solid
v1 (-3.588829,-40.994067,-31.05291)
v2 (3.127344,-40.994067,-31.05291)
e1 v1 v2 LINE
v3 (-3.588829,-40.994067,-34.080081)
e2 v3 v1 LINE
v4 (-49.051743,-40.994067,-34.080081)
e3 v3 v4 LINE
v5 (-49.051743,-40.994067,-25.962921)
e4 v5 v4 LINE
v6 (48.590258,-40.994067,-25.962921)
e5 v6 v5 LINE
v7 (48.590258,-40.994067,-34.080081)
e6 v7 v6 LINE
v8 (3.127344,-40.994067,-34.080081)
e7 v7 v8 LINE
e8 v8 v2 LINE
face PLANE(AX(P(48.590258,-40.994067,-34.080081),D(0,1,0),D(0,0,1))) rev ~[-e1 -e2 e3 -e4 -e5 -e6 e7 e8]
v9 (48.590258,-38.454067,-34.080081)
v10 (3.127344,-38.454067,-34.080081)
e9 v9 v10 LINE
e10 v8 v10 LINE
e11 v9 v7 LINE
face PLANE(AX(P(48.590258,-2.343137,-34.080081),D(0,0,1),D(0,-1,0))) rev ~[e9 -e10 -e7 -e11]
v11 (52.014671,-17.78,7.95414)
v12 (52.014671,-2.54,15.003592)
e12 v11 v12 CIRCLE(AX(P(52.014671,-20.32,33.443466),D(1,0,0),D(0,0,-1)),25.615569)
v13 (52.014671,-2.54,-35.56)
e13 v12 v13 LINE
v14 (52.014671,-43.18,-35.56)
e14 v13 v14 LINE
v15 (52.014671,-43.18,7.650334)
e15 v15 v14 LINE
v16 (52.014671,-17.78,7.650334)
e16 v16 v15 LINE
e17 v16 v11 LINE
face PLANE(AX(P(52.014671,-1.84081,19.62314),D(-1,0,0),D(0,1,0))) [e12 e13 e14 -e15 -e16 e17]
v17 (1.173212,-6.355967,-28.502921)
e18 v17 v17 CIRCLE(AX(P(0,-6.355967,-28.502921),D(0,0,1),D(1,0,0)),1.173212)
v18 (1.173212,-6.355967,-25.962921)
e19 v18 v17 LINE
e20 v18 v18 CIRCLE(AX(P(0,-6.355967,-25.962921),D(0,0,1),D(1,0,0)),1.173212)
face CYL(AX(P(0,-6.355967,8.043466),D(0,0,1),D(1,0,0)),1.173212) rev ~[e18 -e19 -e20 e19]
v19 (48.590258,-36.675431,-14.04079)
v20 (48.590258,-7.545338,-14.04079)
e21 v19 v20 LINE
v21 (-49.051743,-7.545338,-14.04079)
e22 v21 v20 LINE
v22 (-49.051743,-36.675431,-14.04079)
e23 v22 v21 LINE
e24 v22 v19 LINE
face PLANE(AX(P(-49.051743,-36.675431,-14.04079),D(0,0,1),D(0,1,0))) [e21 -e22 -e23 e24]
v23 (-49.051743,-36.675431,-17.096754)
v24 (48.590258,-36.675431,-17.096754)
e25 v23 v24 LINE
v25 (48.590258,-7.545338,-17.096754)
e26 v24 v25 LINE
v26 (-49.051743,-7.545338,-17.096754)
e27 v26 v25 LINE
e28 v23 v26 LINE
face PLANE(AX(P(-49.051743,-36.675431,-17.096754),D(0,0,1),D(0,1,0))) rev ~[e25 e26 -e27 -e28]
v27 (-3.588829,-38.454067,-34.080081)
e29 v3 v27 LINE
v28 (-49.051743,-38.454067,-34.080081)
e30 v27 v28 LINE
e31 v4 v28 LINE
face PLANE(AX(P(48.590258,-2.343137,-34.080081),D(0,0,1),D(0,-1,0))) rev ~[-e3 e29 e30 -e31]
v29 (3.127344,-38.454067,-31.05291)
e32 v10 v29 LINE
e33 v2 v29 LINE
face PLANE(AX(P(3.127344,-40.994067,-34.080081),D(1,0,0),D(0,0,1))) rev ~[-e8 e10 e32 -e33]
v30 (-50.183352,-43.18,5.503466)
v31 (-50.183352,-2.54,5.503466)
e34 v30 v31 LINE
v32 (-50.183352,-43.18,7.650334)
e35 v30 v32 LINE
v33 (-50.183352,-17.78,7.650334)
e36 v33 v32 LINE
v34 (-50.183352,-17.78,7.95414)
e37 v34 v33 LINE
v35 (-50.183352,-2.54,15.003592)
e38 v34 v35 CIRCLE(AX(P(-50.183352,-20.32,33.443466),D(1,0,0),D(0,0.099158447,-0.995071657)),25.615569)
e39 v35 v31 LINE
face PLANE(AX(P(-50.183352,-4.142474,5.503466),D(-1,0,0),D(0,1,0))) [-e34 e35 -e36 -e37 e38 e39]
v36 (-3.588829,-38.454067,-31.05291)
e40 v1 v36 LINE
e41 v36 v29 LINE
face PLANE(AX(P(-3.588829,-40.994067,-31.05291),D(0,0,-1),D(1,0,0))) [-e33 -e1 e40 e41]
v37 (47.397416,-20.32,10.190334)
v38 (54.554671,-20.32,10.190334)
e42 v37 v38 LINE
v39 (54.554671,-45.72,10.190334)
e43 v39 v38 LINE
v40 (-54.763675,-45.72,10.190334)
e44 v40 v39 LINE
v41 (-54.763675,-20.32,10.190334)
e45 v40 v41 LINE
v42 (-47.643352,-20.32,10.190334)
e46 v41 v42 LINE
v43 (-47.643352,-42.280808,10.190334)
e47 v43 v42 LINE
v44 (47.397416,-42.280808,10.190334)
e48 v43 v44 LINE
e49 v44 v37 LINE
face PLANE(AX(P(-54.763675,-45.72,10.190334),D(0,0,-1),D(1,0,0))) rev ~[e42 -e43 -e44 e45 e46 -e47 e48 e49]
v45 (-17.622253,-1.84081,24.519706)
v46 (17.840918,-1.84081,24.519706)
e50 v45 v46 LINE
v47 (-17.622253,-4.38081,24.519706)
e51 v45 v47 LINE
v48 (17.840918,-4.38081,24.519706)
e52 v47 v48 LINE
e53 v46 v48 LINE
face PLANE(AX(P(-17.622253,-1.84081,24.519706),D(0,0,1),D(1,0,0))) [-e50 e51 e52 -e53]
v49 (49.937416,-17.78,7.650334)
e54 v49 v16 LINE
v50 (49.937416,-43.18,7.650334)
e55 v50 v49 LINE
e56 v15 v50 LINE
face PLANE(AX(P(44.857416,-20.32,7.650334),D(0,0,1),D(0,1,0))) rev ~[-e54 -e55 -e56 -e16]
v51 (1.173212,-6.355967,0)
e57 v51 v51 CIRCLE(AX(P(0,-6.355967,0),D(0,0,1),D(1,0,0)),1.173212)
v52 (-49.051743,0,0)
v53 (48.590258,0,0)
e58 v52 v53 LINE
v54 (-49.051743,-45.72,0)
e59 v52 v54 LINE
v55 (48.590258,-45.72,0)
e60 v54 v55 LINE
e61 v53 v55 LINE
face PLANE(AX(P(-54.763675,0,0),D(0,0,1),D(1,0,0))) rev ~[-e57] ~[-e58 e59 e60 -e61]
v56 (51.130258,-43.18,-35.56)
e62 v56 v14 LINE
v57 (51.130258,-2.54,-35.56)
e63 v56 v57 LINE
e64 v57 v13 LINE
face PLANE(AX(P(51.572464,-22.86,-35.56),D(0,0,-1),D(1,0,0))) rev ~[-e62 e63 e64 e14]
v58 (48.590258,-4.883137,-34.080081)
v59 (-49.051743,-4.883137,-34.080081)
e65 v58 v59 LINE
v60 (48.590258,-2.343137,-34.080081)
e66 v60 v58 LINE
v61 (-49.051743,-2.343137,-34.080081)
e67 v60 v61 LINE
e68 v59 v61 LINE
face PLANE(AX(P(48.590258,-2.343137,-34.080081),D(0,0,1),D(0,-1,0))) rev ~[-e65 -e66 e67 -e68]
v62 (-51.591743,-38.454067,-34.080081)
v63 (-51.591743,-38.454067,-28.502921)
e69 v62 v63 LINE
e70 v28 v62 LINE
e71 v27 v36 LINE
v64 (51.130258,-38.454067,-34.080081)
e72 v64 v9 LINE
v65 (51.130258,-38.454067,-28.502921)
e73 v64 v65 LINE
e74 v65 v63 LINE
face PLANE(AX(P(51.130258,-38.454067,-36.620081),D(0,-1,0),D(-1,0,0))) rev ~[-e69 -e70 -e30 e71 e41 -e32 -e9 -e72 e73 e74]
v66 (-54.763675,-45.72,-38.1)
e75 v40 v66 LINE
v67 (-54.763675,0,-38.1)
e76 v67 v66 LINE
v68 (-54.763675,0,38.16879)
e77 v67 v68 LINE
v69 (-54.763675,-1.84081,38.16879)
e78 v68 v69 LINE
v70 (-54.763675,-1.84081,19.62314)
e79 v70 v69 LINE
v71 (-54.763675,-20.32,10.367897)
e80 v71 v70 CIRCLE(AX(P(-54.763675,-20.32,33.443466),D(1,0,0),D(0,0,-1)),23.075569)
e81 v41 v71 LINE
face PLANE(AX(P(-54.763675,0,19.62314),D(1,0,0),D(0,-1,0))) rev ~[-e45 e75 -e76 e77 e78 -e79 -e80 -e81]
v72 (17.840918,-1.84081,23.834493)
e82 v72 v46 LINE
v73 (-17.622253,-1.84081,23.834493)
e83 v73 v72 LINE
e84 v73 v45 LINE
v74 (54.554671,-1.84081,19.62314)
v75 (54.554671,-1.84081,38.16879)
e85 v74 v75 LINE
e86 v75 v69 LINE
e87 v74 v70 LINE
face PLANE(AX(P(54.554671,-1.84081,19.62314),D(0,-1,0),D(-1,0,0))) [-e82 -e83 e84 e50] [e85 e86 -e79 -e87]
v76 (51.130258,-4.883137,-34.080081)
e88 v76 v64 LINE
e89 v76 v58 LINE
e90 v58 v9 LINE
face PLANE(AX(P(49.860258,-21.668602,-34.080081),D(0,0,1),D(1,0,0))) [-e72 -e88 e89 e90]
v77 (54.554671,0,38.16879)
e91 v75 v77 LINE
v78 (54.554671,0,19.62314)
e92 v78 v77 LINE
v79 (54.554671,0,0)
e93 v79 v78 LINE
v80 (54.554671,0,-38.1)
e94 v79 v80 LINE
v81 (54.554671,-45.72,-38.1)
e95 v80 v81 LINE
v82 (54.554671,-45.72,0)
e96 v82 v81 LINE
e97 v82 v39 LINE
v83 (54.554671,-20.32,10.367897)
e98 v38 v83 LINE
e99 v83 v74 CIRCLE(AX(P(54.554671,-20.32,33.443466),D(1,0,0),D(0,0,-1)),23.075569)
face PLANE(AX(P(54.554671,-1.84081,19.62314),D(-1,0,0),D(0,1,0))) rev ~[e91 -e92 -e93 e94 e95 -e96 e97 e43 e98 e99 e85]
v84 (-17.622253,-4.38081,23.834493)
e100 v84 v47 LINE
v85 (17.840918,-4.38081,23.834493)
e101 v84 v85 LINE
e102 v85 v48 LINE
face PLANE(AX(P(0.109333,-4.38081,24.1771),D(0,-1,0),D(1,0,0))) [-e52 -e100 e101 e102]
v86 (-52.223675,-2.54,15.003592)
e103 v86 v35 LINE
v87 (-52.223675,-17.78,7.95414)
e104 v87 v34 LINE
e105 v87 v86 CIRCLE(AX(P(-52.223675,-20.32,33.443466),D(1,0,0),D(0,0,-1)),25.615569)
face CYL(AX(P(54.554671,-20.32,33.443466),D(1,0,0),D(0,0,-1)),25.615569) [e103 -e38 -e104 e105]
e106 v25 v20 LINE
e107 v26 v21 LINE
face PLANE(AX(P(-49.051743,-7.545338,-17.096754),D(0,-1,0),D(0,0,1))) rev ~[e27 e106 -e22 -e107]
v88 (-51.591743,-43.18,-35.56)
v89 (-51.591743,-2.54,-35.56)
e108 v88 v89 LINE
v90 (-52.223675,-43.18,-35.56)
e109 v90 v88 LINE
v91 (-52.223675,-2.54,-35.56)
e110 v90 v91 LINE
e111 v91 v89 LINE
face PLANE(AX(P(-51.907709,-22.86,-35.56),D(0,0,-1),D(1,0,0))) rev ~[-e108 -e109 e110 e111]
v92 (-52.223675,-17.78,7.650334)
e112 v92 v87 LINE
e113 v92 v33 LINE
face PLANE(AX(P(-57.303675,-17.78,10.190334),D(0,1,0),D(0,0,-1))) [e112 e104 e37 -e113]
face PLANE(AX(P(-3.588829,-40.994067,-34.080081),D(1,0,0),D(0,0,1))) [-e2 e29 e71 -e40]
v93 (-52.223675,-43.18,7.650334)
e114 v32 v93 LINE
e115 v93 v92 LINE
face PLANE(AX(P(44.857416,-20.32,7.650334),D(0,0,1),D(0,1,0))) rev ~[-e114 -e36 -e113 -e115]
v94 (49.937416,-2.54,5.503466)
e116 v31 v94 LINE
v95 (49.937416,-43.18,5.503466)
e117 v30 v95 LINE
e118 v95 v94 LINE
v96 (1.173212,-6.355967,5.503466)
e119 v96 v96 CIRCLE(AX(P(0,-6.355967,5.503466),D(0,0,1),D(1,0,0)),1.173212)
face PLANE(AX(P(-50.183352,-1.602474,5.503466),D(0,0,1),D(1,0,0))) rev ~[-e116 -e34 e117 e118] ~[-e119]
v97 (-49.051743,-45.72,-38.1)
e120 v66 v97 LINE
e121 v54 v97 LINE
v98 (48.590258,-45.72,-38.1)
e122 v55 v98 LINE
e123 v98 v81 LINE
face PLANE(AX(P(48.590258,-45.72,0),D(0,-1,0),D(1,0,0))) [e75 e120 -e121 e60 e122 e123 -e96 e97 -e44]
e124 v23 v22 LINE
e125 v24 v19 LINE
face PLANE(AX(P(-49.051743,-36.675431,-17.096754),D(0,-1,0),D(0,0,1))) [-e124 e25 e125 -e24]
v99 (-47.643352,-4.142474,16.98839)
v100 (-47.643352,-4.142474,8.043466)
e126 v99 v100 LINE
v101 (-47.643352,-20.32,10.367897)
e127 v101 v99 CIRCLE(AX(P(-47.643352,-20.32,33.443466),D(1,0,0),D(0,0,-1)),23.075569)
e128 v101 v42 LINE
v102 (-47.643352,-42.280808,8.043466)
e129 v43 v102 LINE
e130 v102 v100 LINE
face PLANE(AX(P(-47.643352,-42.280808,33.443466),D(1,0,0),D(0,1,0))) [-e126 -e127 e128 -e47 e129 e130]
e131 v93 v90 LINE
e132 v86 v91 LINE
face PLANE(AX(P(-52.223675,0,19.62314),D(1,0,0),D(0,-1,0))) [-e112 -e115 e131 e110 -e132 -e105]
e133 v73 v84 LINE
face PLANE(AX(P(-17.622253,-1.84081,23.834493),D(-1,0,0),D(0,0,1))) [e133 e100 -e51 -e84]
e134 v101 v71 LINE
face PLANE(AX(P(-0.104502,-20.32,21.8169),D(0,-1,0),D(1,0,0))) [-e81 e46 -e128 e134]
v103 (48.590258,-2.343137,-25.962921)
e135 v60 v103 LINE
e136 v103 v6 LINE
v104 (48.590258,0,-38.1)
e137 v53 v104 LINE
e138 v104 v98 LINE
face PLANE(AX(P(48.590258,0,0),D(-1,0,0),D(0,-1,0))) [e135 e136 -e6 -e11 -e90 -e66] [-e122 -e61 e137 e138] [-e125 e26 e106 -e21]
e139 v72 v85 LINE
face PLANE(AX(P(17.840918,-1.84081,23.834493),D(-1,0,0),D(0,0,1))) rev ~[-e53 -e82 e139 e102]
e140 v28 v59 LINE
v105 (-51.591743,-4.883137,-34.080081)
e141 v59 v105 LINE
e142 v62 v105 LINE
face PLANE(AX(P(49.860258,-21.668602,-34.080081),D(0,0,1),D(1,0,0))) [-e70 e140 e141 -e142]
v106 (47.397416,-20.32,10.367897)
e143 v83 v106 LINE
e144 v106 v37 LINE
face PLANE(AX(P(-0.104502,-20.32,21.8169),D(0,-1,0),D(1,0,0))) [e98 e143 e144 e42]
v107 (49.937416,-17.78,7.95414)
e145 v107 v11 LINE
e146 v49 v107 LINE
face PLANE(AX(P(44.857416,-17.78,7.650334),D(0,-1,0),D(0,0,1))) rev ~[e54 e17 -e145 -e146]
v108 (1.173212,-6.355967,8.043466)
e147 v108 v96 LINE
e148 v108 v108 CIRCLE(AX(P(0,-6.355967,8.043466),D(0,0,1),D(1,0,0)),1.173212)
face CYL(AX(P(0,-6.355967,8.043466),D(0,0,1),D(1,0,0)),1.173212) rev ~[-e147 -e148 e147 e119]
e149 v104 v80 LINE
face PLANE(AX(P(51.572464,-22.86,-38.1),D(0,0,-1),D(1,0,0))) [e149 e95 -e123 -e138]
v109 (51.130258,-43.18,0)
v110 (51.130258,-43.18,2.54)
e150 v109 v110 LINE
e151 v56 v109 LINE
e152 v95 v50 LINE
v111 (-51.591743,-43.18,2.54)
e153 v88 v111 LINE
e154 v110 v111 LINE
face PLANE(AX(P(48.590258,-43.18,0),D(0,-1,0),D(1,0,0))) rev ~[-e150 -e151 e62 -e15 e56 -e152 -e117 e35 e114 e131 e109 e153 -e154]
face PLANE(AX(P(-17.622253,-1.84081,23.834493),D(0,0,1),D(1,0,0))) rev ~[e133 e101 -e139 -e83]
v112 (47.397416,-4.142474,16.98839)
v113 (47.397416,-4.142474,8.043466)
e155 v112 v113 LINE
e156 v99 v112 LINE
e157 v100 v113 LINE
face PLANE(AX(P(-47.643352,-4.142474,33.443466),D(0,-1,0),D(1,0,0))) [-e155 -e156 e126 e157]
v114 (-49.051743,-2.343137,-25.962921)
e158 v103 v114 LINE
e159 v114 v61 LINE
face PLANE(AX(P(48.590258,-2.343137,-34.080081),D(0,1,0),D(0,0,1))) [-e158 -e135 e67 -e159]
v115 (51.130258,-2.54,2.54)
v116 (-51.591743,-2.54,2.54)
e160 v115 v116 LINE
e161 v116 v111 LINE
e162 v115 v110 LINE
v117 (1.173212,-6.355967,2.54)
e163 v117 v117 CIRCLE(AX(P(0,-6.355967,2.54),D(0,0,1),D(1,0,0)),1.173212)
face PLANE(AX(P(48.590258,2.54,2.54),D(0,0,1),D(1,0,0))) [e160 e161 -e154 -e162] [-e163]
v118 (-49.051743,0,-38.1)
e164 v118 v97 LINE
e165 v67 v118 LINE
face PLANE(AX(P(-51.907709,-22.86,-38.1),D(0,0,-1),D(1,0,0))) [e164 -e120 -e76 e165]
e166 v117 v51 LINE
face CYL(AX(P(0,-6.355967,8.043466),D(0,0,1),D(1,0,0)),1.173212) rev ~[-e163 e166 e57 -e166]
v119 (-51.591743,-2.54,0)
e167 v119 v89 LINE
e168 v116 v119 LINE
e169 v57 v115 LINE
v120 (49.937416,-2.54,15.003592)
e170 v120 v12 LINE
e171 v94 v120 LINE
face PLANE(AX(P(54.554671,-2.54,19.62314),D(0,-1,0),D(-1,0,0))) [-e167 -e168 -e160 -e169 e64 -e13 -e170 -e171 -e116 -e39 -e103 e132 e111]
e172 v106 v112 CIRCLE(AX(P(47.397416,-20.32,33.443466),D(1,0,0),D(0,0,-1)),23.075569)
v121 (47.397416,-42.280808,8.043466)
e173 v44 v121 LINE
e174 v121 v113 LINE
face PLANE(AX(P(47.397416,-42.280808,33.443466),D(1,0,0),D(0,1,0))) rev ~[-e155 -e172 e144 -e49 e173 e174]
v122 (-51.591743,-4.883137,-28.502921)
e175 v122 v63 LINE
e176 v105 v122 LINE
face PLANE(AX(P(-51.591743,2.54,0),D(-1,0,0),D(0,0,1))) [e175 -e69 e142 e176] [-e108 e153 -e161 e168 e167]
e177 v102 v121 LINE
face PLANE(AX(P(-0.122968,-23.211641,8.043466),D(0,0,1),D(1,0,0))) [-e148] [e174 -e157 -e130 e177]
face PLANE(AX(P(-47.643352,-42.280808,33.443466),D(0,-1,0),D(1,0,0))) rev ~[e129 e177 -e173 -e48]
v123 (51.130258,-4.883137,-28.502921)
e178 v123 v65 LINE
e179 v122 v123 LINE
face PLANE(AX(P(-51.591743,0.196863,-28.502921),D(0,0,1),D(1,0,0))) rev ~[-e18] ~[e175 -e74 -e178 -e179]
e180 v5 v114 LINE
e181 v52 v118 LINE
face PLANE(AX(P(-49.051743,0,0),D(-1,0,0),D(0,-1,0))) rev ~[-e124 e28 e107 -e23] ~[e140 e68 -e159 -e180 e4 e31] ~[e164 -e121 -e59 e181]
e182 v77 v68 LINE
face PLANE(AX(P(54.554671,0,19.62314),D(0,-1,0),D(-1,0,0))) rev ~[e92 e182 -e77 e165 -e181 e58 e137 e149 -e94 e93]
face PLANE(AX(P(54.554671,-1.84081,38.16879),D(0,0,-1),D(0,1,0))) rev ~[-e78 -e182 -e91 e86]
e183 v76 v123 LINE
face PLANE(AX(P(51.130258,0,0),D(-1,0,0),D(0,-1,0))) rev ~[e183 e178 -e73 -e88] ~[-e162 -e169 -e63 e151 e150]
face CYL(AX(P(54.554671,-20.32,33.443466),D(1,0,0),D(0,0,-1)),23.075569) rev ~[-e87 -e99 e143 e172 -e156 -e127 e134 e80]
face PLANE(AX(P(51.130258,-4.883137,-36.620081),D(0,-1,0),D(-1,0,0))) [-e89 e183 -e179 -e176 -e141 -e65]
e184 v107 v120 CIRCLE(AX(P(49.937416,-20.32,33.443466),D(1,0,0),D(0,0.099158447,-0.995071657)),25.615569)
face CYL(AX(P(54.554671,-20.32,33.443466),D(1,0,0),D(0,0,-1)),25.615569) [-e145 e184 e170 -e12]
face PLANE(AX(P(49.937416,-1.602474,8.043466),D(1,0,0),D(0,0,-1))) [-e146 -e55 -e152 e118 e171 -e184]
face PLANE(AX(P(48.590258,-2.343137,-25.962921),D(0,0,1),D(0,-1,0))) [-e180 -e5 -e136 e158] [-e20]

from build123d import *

# Parameters (mm, degrees)
F0_W          = 109.3183457851
F0_H          = 33.4434658289
F1_DEPTH      = 45.72
F2_W          = 95.0407683849
F2_H          = 38.138333708
F3_DEPTH      = 25.4
F4_W          = 109.3183457851
F4_H          = 23.2531316578
F5_DEPTH      = 25.4
F7_DEPTH      = 254
F9_W          = 5.9644132853
F9_H          = 45.72
F9_W_2        = 5.7119317353
F10_DEPTH     = 38.1
F11_W         = 29.130092822
F11_H         = 3.0559636652
F12_DEPTH     = 101.6
F14_DEPTH     = 127
F15_DEPTH     = 18.5456499457
F16_W         = 35.4631710798
F16_H         = 0.6852131337
F17_DEPTH     = 2.54
F18_W         = 38.6509299278
F18_H         = 8.1171598285
F19_DEPTH     = 99.9768525362
F20_T         = 2.54
F20_T3_DEPTH  = 114.3983457851
F20_T5_DEPTH  = 40.5431710798
F20_T7_DEPTH  = 5.7652131337
F20_T9_DEPTH  = 12.2003224361
F20_T11_DEPTH = 12.2372549641
F20_T13_DEPTH = 50.8
F20_T15_DEPTH = 13.1971598285
F20_T17_DEPTH = 43.7309299278
F20_T19_DEPTH = 34.210092822
F20_T21_DEPTH = 8.1359636652
F20_T23_DEPTH = 7.2268683422
F20_T25_DEPTH = 43.218333708
F20_T27_DEPTH = 14.0249238314
F20_T29_DEPTH = 100.1207683849
F21_W         = 6.7161731422
F21_H         = 3.0271708965
F22_DEPTH     = 25.4
F8_R          = 1.1732121366
F23_DEPTH     = 69.3976804614


# Not quite as in the source:
# - a shell that OpenCascade refuses in one call is made with other operations: the cavity is built on its own and cut out


with BuildPart() as f1:
    # F0 (on Front) → F1 (new body)
    with BuildSketch(Plane.XZ):
        with Locations((-0.1045018435, 16.7217329144)):
            Rectangle(F0_W, F0_H)
    extrude(amount=F1_DEPTH)

    # F2 (on face) → F3 (cut)
    with BuildSketch(Plane.XY.offset(33.4434658289)):
        with Locations((-0.1229681075, -23.2116412371)):
            Rectangle(F2_W, F2_H)
    extrude(amount=-F3_DEPTH, mode=Mode.SUBTRACT)

    # F4 (on face) → F5 (cut)
    with BuildSketch(Plane.XZ.offset(45.72)):
        with Locations((-0.1045018435, 21.8169)):
            Rectangle(F4_W, F4_H)
    extrude(amount=-F5_DEPTH, mode=Mode.SUBTRACT)

    # F6 (on face) → F7 (cut)
    with BuildSketch(Plane.YZ.offset(54.5546710491)):
        with BuildLine():
            Line((-20.32, 33.4434658289), (-20.32, 10.3678972162))
            ThreePointArc((-20.32, 10.3678972162), (-8.4847772871, 13.6341404962), (0, 22.5082261516))
            Line((0, 22.5082261516), (0, 33.4434658289))
            Line((0, 33.4434658289), (-20.32, 33.4434658289))
        make_face()
        with BuildLine():
            ThreePointArc((0, 22.5082261516), (2.0560745106, 27.8049237926), (2.7555686127, 33.4434658289))
            ThreePointArc((2.7555686127, 33.4434658289), (-36.6368910458, 49.7603568747), (-20.32, 10.3678972162))
            Line((-20.32, 10.3678972162), (-20.32, 33.4434658289))
            Line((-20.32, 33.4434658289), (0, 33.4434658289))
            Line((0, 33.4434658289), (0, 22.5082261516))
        make_face()
    extrude(amount=-F7_DEPTH, mode=Mode.SUBTRACT)

    # F9 (on face) → F10 (join)
    with BuildSketch(Plane(origin=(0, 0, 0), x_dir=(1, 0, 0), z_dir=(0, 0, -1))):
        with Locations((51.5724644065, 22.86)):
            Rectangle(F9_W, F9_H)
        with Locations((-51.9077088684, 22.86)):
            Rectangle(F9_W_2, F9_H)
    extrude(amount=F10_DEPTH)

    # F11 (on face) → F12 (join)
    with BuildSketch(Plane.YZ.offset(-49.0517430007)):
        with Locations((-22.1103844233, -15.5687723309)):
            Rectangle(F11_W, F11_H)
    extrude(amount=F12_DEPTH)

    # F13 (on face) → F14 (cut)
    with BuildSketch(Plane.YZ.offset(54.5546710491)):
        with BuildLine():
            ThreePointArc((0, 22.5082261516), (-0.8668457158, 21.0315096899), (-1.8408102843, 19.6231397021))
            Line((-1.8408102843, 19.6231397021), (0, 19.6231397021))
            Line((0, 19.6231397021), (0, 22.5082261516))
        make_face()
    extrude(amount=-F14_DEPTH, mode=Mode.SUBTRACT)

    # F15 (add): a face of the model
    f15_faces = [f1.faces().sort_by_distance(p)[0] for p in [
        (-0.1045018435, -0.9204051421, 19.6231397021),
    ]]
    extrude(f15_faces, amount=F15_DEPTH)

    # F16 (on face) → F17 (join)
    with BuildSketch(Plane.XZ.offset(1.8408102843)):
        with Locations((0.1093326136, 24.1770995781)):
            Rectangle(F16_W, F16_H)
    extrude(amount=F17_DEPTH)

    # F18 (on face) → F19 (join)
    with BuildSketch(Plane(origin=(48.5902577639, 0, 0), x_dir=(0, -1, 0), z_dir=(-1, 0, 0))):
        with Locations((21.6686017811, -30.0215007737)):
            Rectangle(F18_W, F18_H)
    extrude(amount=F19_DEPTH)

    # F20: shell of thickness 2.54, made by hand


with BuildPart() as f20_core1:
    # F20_t2: copy of F1
    add(f1.part)

    # the walls: a layer under each face that stays
    f20_faces = [f20_core1.faces().sort_by_distance(p)[0] for p in [
        (-54.763674736, -22.86, 0.0343948239),
        (-0.1045018435, 0, 0.0343948239),
        (-0.1045018435, -0.9204051421, 38.1687896479),
        (-0.1045018435, -1.8408102843, 28.895964675),
        (-46.9552214657, -2.7975084588, 18.4286678952),
        (-51.203513518, -20.32, 10.2791156936),
        (-46.9552214657, -43.9057142857, 10.1903341711),
        (-36.5439504385, -45.72, 2.1419451425),
        (-51.9077088684, -22.86, -38.1),
        (54.5546710491, -22.86, 0.0343948239),
        (-49.0517430007, -22.86, -19.05),
        (-0.2307426184, -22.86, 0),
        (48.5902577639, -22.86, -19.05),
        (51.5724644065, -22.86, -38.1),
        (0.1093326136, -3.1108102843, 24.5197061449),
        (-17.6222529262, -3.1108102843, 24.1770995781),
        (0.1093326136, -3.1108102843, 23.8344930112),
        (17.8409181535, -3.1108102843, 24.1770995781),
        (-47.6433522999, -10.4988633345, 9.5342864675),
        (-0.1229681075, -4.1424743831, 12.5159277446),
        (47.397416085, -35.9244191398, 9.5342864675),
        (50.9760435671, -20.32, 10.2791156936),
        (-0.1229681075, -42.2808080912, 9.1169),
        (-0.2307426184, -40.994066745, -30.0215007737),
        (-0.2307426184, -21.6686017811, -25.9629208595),
        (-0.2307426184, -2.3431368172, -30.0215007737),
        (-0.2307426184, -22.1103844233, -14.0407904983),
        (-0.2307426184, -7.5453380123, -15.5687723309),
        (-0.2307426184, -36.6754308343, -15.5687723309),
        (-0.2307426184, -22.1103844233, -17.0967541635),
        (0.1093326136, -4.3808102843, 24.1770995781),
        (-0.1229681075, -23.2116412371, 8.0434658289),
    ]]
    thicken(f20_faces, amount=-F20_T, mode=Mode.SUBTRACT)

    # F20_s4 → F20_t3 (cut)
    with BuildSketch(Plane.YZ.offset(-57.303674736)):
        Polygon((-1.8865509063, 19.6383521673), (0.6991897157, 19.6231397021), (0.6991897157, 18.7783837759), (0.1932519166, 18.1018931859), align=None)
    extrude(amount=F20_T3_DEPTH, mode=Mode.SUBTRACT)

    # F20_s6 → F20_t5 (cut)
    with BuildSketch(Plane.YZ.offset(-20.1622529262)):
        Polygon((-1.8662102843, 24.5451061449), (0.6991897157, 24.5197061449), (0.6991897157, 21.9797061449), (-1.8408102843, 21.9797061449), align=None)
        Polygon((-1.8662102843, 23.8090930112), (0.6991897157, 23.8344930112), (0.6991897157, 26.3744930112), (-1.8408102843, 26.3744930112), align=None)
    extrude(amount=F20_T5_DEPTH, mode=Mode.SUBTRACT)

    # F20_s8 → F20_t7 (cut)
    with BuildSketch(Plane.XY.offset(21.2944930112)):
        Polygon((-17.6476529262, -1.8662102843), (-17.6222529262, 0.6991897157), (-15.0822529262, 0.6991897157), (-15.0822529262, -1.8408102843), align=None)
        Polygon((17.8663181535, -1.8662102843), (17.8409181535, 0.6991897157), (15.3009181535, 0.6991897157), (15.3009181535, -1.8408102843), align=None)
    extrude(amount=F20_T7_DEPTH, mode=Mode.SUBTRACT)

    # F20_s10 → F20_t9 (cut)
    with BuildSketch(Plane.YZ.offset(-57.303674736)):
        Polygon((-20.3454, 10.2157341711), (-17.78, 10.1903341711), (-17.78, 7.6503341711), (-20.32, 7.6503341711), align=None)
    extrude(amount=F20_T9_DEPTH, mode=Mode.SUBTRACT)

    # F20_s12 → F20_t11 (cut)
    with BuildSketch(Plane.YZ.offset(44.857416085)):
        Polygon((-20.3454, 10.2157341711), (-20.32, 7.6503341711), (-17.78, 7.6503341711), (-17.78, 10.1903341711), align=None)
    extrude(amount=F20_T11_DEPTH, mode=Mode.SUBTRACT)

    # F20_s14 → F20_t13 (cut)
    with BuildSketch(Plane.XZ.offset(-2.54)):
        Polygon((-49.0263430007, -0.0254), (-51.5917430007, 0), (-51.5917430007, 2.54), (-49.0517430007, 2.54), align=None)
        Polygon((48.5648577639, -0.0254), (48.5902577639, 2.54), (51.1302577639, 2.54), (51.1302577639, 0), align=None)
    extrude(amount=F20_T13_DEPTH, mode=Mode.SUBTRACT)

    # F20_s16 → F20_t15 (cut)
    with BuildSketch(Plane.XY.offset(-36.620080688)):
        Polygon((-49.0263430007, -41.019466745), (-51.5917430007, -40.994066745), (-51.5917430007, -38.454066745), (-49.0517430007, -38.454066745), align=None)
        Polygon((-49.0263430007, -2.3177368172), (-51.5917430007, -2.3431368172), (-51.5917430007, -4.8831368172), (-49.0517430007, -4.8831368172), align=None)
        Polygon((48.5648577639, -2.3177368172), (51.1302577639, -2.3431368172), (51.1302577639, -4.8831368172), (48.5902577639, -4.8831368172), align=None)
        Polygon((48.5648577639, -41.019466745), (51.1302577639, -40.994066745), (51.1302577639, -38.454066745), (48.5902577639, -38.454066745), align=None)
    extrude(amount=F20_T15_DEPTH, mode=Mode.SUBTRACT)

    # F20_s18 → F20_t17 (cut)
    with BuildSketch(Plane.XZ.offset(-0.1968631828)):
        Polygon((-49.0263430007, -25.9375208595), (-51.5917430007, -25.9629208595), (-51.5917430007, -28.5029208595), (-49.0517430007, -28.5029208595), align=None)
        Polygon((48.5648577639, -25.9375208595), (51.1302577639, -25.9629208595), (51.1302577639, -28.5029208595), (48.5902577639, -28.5029208595), align=None)
    extrude(amount=F20_T17_DEPTH, mode=Mode.SUBTRACT)

    # F20_s20 → F20_t19 (cut)
    with BuildSketch(Plane.XZ.offset(5.0053380123)):
        Polygon((-49.0263430007, -14.0153904983), (-51.5917430007, -14.0407904983), (-51.5917430007, -16.5807904983), (-49.0517430007, -16.5807904983), align=None)
        Polygon((-49.0263430007, -17.1221541635), (-51.5917430007, -17.0967541635), (-51.5917430007, -14.5567541635), (-49.0517430007, -14.5567541635), align=None)
        Polygon((48.5648577639, -17.1221541635), (51.1302577639, -17.0967541635), (51.1302577639, -14.5567541635), (48.5902577639, -14.5567541635), align=None)
        Polygon((48.5648577639, -14.0153904983), (51.1302577639, -14.0407904983), (51.1302577639, -16.5807904983), (48.5902577639, -16.5807904983), align=None)
    extrude(amount=F20_T19_DEPTH, mode=Mode.SUBTRACT)

    # F20_s22 → F20_t21 (cut)
    with BuildSketch(Plane.XY.offset(-19.6367541635)):
        Polygon((-49.0263430007, -7.5199380123), (-51.5917430007, -7.5453380123), (-51.5917430007, -10.0853380123), (-49.0517430007, -10.0853380123), align=None)
        Polygon((-49.0263430007, -36.7008308343), (-51.5917430007, -36.6754308343), (-51.5917430007, -34.1354308343), (-49.0517430007, -34.1354308343), align=None)
        Polygon((48.5648577639, -7.5199380123), (51.1302577639, -7.5453380123), (51.1302577639, -10.0853380123), (48.5902577639, -10.0853380123), align=None)
        Polygon((48.5648577639, -36.7008308343), (51.1302577639, -36.6754308343), (51.1302577639, -34.1354308343), (48.5902577639, -34.1354308343), align=None)
    extrude(amount=F20_T21_DEPTH, mode=Mode.SUBTRACT)

    # F20_s24 → F20_t23 (cut)
    with BuildSketch(Plane.XY.offset(5.5034658289)):
        Polygon((-47.6179522999, -42.2554080912), (-50.1833522999, -42.2808080912), (-50.1833522999, -44.8208080912), (-47.6433522999, -44.8208080912), align=None)
        Polygon((47.372016085, -42.2554080912), (49.937416085, -42.2808080912), (49.937416085, -44.8208080912), (47.397416085, -44.8208080912), align=None)
    extrude(amount=F20_T23_DEPTH, mode=Mode.SUBTRACT)

    # F20_s26 → F20_t25 (cut)
    with BuildSketch(Plane.XZ.offset(1.6024743831)):
        Polygon((-47.6179522999, 8.0688658289), (-50.1833522999, 8.0434658289), (-50.1833522999, 5.5034658289), (-47.6433522999, 5.5034658289), align=None)
        Polygon((47.372016085, 8.0688658289), (49.937416085, 8.0434658289), (49.937416085, 5.5034658289), (47.397416085, 5.5034658289), align=None)
    extrude(amount=F20_T25_DEPTH, mode=Mode.SUBTRACT)

    # F20_s28 → F20_t27 (cut)
    with BuildSketch(Plane.XY.offset(5.5034658289)):
        Polygon((-47.6179522999, -4.1678743831), (-50.1833522999, -4.1424743831), (-50.1833522999, -1.6024743831), (-47.6433522999, -1.6024743831), align=None)
        Polygon((47.372016085, -4.1678743831), (47.397416085, -1.6024743831), (49.937416085, -1.6024743831), (49.937416085, -4.1424743831), align=None)
    extrude(amount=F20_T27_DEPTH, mode=Mode.SUBTRACT)

    # F20_s30 → F20_t29 (cut)
    with BuildSketch(Plane.YZ.offset(-50.1833522999)):
        Polygon((-4.1678743831, 8.0688658289), (-1.6024743831, 8.0434658289), (-1.6024743831, 5.5034658289), (-4.1424743831, 5.5034658289), align=None)
        Polygon((-42.2554080912, 8.0688658289), (-44.8208080912, 8.0434658289), (-44.8208080912, 5.5034658289), (-42.2808080912, 5.5034658289), align=None)
    extrude(amount=F20_T29_DEPTH, mode=Mode.SUBTRACT)


with BuildPart() as f1_1:
    add(f1.part)

    # what is left inside the walls is the cavity
    f20_cavity = [f20_core1.part.solids().sort_by_distance(p)[0] for p in [
        (-0.230743, -29.633333, 2.5654),
    ]]
    add(f20_cavity, mode=Mode.SUBTRACT)

    # F21 (on face) → F22 (cut)
    with BuildSketch(Plane.XZ.offset(40.994066745)):
        with Locations((-0.2307426184, -32.5664952397)):
            Rectangle(F21_W, F21_H)
    extrude(amount=-F22_DEPTH, mode=Mode.SUBTRACT)

    # F8 (on face) → F23 (cut)
    with BuildSketch(Plane.XY.offset(8.0434658289)):
        with Locations((0, -6.3559673727)):
            Circle(F8_R)
    extrude(amount=-F23_DEPTH, mode=Mode.SUBTRACT)


solid = f1_1.part
